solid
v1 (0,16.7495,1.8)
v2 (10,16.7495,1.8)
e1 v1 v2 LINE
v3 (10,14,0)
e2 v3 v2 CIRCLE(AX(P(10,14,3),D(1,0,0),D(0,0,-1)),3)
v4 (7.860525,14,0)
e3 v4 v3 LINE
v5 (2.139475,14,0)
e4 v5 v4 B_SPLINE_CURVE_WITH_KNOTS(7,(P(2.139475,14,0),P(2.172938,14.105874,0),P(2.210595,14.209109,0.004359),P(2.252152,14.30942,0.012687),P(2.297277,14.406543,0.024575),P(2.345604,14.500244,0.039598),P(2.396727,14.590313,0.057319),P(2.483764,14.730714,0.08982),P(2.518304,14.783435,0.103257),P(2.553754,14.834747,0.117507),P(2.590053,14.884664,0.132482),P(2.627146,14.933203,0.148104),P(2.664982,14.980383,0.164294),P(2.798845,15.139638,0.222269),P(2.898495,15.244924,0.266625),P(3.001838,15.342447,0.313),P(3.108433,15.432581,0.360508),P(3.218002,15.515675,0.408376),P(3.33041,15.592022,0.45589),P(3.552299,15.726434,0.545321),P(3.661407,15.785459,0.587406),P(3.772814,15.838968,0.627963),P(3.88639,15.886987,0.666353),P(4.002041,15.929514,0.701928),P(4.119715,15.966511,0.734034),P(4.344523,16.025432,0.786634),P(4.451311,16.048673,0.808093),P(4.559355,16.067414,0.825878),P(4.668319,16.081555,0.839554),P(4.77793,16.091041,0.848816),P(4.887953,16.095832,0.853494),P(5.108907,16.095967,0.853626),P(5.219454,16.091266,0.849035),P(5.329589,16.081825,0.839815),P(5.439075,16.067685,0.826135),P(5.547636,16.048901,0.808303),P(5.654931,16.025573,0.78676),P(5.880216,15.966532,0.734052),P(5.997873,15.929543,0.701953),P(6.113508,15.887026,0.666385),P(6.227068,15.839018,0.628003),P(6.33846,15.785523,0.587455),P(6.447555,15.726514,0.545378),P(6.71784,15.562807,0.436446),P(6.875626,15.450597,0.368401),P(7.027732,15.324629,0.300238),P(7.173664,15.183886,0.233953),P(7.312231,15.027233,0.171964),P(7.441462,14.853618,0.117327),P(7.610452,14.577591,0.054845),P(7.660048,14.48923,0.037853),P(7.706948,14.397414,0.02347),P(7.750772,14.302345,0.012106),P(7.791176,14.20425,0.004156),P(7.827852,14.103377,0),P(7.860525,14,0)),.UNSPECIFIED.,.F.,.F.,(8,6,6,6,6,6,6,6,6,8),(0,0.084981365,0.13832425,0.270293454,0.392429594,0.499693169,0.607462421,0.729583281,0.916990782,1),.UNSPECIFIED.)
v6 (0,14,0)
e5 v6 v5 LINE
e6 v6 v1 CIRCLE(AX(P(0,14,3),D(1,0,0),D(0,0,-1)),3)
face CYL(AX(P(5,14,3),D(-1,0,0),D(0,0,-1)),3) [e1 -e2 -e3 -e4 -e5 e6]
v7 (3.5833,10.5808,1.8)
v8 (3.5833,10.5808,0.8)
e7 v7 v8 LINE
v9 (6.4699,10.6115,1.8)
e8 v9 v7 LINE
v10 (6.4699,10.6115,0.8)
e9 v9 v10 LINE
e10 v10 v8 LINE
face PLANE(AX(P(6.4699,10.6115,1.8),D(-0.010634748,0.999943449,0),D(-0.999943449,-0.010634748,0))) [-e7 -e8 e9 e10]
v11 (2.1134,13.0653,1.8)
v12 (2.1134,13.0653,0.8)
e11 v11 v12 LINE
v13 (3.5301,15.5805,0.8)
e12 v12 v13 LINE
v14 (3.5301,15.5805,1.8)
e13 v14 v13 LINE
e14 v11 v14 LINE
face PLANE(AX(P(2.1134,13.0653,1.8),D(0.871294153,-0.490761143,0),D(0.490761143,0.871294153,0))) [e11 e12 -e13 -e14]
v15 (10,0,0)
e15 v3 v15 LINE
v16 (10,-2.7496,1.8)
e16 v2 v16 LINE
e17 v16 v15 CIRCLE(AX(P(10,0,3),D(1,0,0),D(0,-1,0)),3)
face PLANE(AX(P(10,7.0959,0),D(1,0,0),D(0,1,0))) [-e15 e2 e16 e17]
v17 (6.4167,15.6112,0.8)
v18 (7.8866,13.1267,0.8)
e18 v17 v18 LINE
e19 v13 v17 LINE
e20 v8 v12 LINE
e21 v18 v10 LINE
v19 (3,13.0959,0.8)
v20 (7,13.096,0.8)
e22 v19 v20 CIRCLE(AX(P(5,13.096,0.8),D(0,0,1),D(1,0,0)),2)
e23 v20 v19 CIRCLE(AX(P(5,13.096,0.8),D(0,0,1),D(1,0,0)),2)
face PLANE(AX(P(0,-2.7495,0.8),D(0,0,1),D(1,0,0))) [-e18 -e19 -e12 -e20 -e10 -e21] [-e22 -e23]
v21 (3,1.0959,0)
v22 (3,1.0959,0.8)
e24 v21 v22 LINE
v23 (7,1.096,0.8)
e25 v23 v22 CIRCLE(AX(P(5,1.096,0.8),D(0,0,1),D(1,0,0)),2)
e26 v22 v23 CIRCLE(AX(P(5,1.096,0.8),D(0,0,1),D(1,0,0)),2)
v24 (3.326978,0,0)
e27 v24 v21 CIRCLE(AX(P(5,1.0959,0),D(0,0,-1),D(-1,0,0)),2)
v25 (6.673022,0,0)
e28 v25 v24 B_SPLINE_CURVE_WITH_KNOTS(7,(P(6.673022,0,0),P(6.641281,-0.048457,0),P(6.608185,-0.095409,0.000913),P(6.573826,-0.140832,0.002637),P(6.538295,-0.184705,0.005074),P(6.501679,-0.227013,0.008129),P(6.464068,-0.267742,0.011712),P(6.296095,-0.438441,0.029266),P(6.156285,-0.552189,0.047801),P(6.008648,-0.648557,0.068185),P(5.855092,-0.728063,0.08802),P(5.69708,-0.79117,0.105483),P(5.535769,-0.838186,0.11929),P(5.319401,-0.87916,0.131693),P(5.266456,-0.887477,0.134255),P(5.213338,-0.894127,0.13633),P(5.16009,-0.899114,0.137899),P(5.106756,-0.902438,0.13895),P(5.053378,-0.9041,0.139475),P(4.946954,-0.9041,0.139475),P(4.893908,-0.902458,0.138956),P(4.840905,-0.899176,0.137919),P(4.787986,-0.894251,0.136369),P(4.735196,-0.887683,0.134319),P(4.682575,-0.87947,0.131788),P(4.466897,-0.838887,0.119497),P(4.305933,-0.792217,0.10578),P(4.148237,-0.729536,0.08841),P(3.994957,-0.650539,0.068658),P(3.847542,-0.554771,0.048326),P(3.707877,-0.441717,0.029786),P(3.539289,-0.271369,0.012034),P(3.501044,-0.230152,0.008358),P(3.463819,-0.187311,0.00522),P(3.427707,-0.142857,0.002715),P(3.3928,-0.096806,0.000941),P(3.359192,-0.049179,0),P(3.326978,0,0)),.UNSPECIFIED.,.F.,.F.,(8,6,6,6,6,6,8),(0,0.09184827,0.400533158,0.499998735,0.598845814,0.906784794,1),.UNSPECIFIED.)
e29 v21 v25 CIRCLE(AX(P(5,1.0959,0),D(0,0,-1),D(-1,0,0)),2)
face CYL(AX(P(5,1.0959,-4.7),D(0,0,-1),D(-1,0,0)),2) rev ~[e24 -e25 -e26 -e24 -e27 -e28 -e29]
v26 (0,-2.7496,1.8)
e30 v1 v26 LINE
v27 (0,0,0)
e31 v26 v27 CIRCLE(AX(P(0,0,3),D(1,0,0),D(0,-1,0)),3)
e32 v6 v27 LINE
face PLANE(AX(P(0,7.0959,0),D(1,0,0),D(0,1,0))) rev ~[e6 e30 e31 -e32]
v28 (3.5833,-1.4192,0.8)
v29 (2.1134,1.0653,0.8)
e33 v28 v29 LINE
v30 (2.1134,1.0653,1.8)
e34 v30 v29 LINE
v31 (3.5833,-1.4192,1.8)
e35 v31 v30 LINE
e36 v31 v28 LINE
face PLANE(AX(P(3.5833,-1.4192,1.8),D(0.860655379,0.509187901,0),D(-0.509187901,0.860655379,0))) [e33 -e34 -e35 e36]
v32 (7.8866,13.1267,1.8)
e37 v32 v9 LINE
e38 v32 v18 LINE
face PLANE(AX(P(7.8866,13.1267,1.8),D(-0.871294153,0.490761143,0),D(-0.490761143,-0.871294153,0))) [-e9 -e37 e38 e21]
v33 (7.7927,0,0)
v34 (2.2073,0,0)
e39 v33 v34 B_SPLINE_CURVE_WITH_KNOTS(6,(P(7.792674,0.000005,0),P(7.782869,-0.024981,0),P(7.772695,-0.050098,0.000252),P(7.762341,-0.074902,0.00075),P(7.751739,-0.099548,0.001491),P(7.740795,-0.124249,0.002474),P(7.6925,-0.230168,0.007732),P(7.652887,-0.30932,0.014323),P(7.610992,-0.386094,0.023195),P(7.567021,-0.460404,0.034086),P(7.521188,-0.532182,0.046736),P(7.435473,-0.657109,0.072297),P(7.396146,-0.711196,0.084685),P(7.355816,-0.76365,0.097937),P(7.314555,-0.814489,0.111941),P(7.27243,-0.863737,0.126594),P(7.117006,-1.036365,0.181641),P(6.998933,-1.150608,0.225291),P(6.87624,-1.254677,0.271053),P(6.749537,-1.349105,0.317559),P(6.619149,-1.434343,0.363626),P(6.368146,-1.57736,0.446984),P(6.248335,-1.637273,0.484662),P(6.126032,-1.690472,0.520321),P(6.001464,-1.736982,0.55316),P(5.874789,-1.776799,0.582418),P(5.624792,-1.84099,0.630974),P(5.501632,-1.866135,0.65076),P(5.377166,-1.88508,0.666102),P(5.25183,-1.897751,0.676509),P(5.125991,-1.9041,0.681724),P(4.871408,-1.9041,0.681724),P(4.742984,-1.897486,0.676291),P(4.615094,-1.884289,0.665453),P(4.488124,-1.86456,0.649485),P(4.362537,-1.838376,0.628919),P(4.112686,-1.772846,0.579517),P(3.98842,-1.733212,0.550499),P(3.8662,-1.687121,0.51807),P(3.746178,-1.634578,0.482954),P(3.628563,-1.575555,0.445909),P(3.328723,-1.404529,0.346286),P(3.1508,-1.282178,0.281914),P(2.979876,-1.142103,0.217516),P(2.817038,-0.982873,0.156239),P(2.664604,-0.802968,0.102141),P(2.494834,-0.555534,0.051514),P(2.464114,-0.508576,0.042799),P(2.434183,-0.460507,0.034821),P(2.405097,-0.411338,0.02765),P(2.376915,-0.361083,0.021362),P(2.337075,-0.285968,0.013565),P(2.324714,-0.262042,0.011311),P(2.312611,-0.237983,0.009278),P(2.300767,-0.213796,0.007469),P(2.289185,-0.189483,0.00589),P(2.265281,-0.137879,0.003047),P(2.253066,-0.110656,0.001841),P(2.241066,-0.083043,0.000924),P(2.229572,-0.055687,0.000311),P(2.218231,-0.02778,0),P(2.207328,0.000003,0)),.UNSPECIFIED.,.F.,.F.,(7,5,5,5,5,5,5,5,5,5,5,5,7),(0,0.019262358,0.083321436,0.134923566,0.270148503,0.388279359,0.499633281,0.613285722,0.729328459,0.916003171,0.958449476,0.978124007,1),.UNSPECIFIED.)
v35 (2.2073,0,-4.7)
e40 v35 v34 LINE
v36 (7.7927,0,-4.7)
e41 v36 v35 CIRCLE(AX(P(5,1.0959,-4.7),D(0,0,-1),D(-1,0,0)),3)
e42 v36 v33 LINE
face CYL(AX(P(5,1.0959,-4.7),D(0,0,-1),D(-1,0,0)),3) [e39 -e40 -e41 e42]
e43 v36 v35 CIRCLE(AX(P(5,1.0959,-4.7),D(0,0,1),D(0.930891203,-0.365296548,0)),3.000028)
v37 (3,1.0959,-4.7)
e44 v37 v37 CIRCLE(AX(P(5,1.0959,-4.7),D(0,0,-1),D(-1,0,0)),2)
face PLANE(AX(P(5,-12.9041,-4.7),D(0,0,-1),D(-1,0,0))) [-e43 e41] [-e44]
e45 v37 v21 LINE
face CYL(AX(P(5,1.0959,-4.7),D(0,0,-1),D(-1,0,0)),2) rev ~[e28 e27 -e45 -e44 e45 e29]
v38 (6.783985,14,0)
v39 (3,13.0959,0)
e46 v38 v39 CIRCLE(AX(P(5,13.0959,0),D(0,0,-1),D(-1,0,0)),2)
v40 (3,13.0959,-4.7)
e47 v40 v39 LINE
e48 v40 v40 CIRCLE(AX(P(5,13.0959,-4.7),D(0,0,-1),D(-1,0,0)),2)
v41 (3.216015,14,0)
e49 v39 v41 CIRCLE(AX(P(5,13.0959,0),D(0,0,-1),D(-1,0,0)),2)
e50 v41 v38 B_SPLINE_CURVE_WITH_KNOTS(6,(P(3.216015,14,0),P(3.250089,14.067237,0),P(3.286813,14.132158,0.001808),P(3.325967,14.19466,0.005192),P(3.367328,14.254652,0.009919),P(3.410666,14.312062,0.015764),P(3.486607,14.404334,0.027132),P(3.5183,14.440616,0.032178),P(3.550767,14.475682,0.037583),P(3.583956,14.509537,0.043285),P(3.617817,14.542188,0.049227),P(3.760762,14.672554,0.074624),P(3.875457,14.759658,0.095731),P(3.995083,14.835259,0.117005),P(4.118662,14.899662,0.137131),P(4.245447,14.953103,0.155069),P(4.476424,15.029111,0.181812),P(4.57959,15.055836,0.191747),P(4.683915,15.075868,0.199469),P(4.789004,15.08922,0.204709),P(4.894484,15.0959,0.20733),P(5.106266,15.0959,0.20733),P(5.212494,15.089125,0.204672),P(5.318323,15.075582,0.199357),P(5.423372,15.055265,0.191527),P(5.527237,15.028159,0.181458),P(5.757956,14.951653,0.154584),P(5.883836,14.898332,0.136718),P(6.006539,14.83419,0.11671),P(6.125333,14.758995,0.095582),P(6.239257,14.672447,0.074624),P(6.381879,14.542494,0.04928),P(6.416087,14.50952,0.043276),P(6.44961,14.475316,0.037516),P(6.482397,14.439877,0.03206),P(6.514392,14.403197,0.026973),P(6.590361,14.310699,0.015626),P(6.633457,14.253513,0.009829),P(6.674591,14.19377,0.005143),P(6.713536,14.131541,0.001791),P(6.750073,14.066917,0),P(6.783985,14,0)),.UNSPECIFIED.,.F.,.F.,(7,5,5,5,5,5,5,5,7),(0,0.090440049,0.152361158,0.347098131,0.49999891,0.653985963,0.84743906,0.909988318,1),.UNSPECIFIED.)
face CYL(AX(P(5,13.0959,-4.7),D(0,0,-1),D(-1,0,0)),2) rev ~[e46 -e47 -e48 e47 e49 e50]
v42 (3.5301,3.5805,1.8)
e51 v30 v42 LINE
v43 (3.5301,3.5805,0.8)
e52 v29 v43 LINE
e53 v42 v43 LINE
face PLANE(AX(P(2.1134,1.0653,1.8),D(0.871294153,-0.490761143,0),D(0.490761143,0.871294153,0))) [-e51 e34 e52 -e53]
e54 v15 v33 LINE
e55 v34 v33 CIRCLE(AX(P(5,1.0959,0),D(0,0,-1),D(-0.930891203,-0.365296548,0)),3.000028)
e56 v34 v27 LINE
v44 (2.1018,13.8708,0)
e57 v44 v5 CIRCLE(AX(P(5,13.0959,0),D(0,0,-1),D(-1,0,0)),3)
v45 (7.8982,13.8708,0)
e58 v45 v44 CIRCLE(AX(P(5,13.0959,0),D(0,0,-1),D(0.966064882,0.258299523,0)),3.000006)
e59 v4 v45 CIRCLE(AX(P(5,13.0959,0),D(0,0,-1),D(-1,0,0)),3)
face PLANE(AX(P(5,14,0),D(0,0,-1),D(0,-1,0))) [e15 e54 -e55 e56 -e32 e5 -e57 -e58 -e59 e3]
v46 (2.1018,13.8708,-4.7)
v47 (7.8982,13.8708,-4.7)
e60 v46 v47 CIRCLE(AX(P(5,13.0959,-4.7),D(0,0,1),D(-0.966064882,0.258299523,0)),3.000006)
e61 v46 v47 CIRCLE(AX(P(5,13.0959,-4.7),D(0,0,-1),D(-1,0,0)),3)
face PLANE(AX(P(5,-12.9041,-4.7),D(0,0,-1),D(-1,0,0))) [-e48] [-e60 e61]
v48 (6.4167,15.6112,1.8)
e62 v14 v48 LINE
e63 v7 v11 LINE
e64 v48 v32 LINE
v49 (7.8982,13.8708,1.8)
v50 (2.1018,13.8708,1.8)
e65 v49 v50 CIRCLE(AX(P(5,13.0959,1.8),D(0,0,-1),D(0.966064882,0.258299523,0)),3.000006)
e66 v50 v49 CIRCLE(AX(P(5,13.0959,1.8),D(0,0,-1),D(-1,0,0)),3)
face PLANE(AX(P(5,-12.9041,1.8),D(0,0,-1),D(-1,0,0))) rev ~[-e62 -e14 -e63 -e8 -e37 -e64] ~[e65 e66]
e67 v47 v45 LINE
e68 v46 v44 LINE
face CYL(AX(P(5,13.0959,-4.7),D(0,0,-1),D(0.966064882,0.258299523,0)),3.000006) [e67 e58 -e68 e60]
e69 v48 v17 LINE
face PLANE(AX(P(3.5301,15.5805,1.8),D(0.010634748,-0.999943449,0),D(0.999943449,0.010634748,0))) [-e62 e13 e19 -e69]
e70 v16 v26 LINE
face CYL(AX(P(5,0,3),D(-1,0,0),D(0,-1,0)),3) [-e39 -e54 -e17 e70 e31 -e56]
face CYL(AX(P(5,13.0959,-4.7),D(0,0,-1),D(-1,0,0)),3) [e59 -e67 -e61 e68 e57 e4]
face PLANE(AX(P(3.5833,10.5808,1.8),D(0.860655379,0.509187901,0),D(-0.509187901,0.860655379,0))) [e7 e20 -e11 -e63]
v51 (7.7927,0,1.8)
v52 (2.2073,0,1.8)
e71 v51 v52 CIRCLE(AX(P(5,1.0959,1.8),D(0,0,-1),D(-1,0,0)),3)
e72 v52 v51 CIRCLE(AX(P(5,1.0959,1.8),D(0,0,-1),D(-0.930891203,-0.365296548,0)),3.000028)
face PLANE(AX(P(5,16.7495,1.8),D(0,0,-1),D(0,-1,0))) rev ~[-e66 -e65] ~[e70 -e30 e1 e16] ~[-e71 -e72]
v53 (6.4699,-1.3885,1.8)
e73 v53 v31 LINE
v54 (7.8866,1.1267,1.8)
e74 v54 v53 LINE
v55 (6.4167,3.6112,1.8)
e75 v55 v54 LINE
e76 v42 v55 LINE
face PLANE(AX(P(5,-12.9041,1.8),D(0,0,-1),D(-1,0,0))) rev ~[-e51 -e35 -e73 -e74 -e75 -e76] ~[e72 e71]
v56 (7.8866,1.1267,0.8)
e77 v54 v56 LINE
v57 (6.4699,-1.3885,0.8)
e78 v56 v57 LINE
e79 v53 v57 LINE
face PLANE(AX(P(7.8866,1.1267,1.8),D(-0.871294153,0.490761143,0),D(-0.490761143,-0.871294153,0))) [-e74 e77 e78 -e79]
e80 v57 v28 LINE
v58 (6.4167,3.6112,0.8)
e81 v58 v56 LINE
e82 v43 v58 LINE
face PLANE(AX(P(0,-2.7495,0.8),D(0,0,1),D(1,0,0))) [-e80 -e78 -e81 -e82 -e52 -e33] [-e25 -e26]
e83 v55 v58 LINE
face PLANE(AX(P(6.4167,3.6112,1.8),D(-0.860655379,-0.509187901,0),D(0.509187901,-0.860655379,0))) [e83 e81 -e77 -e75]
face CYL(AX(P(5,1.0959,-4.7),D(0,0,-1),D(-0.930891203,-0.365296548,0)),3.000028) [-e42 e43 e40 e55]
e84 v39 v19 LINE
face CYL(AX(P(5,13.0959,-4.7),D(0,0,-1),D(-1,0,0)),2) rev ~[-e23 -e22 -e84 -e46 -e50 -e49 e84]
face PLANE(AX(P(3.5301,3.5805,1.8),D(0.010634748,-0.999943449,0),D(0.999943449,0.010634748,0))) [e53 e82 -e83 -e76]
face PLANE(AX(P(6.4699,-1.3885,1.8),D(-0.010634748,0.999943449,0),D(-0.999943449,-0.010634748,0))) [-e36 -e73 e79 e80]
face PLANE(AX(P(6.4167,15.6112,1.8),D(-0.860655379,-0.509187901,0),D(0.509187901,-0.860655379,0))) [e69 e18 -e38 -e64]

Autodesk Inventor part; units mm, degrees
ref_plane "XZ Plane" through (0, 0, 0) normal (0, 1, 0) x (-1, 0, 0)
ref_plane "XY Plane" through (0, 0, 0) normal (0, 0, 1) x (1, 0, 0)
ref_plane "Arbeitsebene1" through (5, 7.0959, 0) normal (1, 0, 0) x (0, 1, 0)
sketch "Skizze1" plane through (5, 7.0959, 0) normal (1, 0, 0) x (0, 1, 0)
  arc A0 (6.9041, 0) -> (9.9041, 3) centre (6.9041, 3) ccw projected
  line L0 (6.9041, 0) -> (-7.0959, 0) projected
  arc A1 (-10.0959, 3) -> (-7.0959, 0) centre (-7.0959, 3) ccw projected
  line L1 (9.6536, 1.8) -> (-9.8455, 1.8)
  dimension "d0" = 1.8
extrude "Extrusion1" add sketch "Skizze1" along normal mid plane 10
ref_plane "Arbeitsebene2" through (5, -12.9041, -4.7) normal (0, 0, -1) x (-1, 0, 0)
sketch "Skizze2" plane through (5, -12.9041, -4.7) normal (0, 0, -1) x (-1, 0, 0)
  arc A0 (-2.8982, 26.7749) -> (2.8982, 26.7749) centre (0, 26) ccw projected
  arc A1 (2.7927, 12.9041) -> (-2.7927, 12.9041) centre (0, 14) ccw projected
  circle A2 centre (0, 14) radius 3
  circle A3 centre (0, 26) radius 3
  circle A4 centre (0, 26) radius 2
  circle A5 centre (0, 14) radius 2
  point P0 (5, 12.9041)
  dimension "d3" = 0
  dimension "d4" = 4
extrude "Extrusion2" add sketch "Skizze2" against normal up to surface (6.5 mm away)
sketch "Skizze3" plane through (5, 13.0959, -4.7) normal (0, 0, -1) x (-1, 0, 0)
  circle A0 centre (0, 0) radius 2 projected
  circle A1 centre (0, -12) radius 2 projected
  point P0 (5, -13.0959)
extrude "Extrusion3" cut sketch "Skizze3" against normal up to surface (6.5 mm away)
sketch "Skizze4" plane through (0, -2.7495, 1.8) normal (0, 0, 1) x (1, 0, 0)
  circle A0 centre (5, 15.8455) radius 2 projected
  circle A1 centre (5, 3.8455) radius 2 projected
  line L0 (0, 0) -> (10, 0) projected
  line L1 (10, 19.4991) -> (10, 0) projected
  line L2 (0, 19.4991) -> (10, 19.4991) projected
  line L3 (0, 0) -> (0, 19.4991) projected
  circle A2 centre (5, 15.8455) radius 2 projected
  line L4 (7.8866, 15.8762) -> (6.4699, 13.361)
  line L5 (6.4699, 13.361) -> (3.5833, 13.3303)
  line L6 (3.5833, 13.3303) -> (2.1134, 15.8148)
  line L7 (2.1134, 15.8148) -> (3.5301, 18.33)
  line L8 (3.5301, 18.33) -> (6.4167, 18.3607)
  line L9 (6.4167, 18.3607) -> (7.8866, 15.8762)
  line L10 (7.8866, 3.8762) -> (6.4699, 1.361)
  line L11 (6.4699, 1.361) -> (3.5833, 1.3303)
  line L12 (3.5833, 1.3303) -> (2.1134, 3.8148)
  line L13 (2.1134, 3.8148) -> (3.5301, 6.33)
  line L14 (3.5301, 6.33) -> (6.4167, 6.3607)
  line L15 (6.4167, 6.3607) -> (7.8866, 3.8762)
  point P0 (0, 2.7495)
  dimension "d9" = 5
extrude "Extrusion4" cut sketch "Skizze4" against normal blind 1 contours L4 L5 L6 L7 L8 L9 | L10 L11 L12 L13 L14 L15
properties part number "Isolationsmasse"
